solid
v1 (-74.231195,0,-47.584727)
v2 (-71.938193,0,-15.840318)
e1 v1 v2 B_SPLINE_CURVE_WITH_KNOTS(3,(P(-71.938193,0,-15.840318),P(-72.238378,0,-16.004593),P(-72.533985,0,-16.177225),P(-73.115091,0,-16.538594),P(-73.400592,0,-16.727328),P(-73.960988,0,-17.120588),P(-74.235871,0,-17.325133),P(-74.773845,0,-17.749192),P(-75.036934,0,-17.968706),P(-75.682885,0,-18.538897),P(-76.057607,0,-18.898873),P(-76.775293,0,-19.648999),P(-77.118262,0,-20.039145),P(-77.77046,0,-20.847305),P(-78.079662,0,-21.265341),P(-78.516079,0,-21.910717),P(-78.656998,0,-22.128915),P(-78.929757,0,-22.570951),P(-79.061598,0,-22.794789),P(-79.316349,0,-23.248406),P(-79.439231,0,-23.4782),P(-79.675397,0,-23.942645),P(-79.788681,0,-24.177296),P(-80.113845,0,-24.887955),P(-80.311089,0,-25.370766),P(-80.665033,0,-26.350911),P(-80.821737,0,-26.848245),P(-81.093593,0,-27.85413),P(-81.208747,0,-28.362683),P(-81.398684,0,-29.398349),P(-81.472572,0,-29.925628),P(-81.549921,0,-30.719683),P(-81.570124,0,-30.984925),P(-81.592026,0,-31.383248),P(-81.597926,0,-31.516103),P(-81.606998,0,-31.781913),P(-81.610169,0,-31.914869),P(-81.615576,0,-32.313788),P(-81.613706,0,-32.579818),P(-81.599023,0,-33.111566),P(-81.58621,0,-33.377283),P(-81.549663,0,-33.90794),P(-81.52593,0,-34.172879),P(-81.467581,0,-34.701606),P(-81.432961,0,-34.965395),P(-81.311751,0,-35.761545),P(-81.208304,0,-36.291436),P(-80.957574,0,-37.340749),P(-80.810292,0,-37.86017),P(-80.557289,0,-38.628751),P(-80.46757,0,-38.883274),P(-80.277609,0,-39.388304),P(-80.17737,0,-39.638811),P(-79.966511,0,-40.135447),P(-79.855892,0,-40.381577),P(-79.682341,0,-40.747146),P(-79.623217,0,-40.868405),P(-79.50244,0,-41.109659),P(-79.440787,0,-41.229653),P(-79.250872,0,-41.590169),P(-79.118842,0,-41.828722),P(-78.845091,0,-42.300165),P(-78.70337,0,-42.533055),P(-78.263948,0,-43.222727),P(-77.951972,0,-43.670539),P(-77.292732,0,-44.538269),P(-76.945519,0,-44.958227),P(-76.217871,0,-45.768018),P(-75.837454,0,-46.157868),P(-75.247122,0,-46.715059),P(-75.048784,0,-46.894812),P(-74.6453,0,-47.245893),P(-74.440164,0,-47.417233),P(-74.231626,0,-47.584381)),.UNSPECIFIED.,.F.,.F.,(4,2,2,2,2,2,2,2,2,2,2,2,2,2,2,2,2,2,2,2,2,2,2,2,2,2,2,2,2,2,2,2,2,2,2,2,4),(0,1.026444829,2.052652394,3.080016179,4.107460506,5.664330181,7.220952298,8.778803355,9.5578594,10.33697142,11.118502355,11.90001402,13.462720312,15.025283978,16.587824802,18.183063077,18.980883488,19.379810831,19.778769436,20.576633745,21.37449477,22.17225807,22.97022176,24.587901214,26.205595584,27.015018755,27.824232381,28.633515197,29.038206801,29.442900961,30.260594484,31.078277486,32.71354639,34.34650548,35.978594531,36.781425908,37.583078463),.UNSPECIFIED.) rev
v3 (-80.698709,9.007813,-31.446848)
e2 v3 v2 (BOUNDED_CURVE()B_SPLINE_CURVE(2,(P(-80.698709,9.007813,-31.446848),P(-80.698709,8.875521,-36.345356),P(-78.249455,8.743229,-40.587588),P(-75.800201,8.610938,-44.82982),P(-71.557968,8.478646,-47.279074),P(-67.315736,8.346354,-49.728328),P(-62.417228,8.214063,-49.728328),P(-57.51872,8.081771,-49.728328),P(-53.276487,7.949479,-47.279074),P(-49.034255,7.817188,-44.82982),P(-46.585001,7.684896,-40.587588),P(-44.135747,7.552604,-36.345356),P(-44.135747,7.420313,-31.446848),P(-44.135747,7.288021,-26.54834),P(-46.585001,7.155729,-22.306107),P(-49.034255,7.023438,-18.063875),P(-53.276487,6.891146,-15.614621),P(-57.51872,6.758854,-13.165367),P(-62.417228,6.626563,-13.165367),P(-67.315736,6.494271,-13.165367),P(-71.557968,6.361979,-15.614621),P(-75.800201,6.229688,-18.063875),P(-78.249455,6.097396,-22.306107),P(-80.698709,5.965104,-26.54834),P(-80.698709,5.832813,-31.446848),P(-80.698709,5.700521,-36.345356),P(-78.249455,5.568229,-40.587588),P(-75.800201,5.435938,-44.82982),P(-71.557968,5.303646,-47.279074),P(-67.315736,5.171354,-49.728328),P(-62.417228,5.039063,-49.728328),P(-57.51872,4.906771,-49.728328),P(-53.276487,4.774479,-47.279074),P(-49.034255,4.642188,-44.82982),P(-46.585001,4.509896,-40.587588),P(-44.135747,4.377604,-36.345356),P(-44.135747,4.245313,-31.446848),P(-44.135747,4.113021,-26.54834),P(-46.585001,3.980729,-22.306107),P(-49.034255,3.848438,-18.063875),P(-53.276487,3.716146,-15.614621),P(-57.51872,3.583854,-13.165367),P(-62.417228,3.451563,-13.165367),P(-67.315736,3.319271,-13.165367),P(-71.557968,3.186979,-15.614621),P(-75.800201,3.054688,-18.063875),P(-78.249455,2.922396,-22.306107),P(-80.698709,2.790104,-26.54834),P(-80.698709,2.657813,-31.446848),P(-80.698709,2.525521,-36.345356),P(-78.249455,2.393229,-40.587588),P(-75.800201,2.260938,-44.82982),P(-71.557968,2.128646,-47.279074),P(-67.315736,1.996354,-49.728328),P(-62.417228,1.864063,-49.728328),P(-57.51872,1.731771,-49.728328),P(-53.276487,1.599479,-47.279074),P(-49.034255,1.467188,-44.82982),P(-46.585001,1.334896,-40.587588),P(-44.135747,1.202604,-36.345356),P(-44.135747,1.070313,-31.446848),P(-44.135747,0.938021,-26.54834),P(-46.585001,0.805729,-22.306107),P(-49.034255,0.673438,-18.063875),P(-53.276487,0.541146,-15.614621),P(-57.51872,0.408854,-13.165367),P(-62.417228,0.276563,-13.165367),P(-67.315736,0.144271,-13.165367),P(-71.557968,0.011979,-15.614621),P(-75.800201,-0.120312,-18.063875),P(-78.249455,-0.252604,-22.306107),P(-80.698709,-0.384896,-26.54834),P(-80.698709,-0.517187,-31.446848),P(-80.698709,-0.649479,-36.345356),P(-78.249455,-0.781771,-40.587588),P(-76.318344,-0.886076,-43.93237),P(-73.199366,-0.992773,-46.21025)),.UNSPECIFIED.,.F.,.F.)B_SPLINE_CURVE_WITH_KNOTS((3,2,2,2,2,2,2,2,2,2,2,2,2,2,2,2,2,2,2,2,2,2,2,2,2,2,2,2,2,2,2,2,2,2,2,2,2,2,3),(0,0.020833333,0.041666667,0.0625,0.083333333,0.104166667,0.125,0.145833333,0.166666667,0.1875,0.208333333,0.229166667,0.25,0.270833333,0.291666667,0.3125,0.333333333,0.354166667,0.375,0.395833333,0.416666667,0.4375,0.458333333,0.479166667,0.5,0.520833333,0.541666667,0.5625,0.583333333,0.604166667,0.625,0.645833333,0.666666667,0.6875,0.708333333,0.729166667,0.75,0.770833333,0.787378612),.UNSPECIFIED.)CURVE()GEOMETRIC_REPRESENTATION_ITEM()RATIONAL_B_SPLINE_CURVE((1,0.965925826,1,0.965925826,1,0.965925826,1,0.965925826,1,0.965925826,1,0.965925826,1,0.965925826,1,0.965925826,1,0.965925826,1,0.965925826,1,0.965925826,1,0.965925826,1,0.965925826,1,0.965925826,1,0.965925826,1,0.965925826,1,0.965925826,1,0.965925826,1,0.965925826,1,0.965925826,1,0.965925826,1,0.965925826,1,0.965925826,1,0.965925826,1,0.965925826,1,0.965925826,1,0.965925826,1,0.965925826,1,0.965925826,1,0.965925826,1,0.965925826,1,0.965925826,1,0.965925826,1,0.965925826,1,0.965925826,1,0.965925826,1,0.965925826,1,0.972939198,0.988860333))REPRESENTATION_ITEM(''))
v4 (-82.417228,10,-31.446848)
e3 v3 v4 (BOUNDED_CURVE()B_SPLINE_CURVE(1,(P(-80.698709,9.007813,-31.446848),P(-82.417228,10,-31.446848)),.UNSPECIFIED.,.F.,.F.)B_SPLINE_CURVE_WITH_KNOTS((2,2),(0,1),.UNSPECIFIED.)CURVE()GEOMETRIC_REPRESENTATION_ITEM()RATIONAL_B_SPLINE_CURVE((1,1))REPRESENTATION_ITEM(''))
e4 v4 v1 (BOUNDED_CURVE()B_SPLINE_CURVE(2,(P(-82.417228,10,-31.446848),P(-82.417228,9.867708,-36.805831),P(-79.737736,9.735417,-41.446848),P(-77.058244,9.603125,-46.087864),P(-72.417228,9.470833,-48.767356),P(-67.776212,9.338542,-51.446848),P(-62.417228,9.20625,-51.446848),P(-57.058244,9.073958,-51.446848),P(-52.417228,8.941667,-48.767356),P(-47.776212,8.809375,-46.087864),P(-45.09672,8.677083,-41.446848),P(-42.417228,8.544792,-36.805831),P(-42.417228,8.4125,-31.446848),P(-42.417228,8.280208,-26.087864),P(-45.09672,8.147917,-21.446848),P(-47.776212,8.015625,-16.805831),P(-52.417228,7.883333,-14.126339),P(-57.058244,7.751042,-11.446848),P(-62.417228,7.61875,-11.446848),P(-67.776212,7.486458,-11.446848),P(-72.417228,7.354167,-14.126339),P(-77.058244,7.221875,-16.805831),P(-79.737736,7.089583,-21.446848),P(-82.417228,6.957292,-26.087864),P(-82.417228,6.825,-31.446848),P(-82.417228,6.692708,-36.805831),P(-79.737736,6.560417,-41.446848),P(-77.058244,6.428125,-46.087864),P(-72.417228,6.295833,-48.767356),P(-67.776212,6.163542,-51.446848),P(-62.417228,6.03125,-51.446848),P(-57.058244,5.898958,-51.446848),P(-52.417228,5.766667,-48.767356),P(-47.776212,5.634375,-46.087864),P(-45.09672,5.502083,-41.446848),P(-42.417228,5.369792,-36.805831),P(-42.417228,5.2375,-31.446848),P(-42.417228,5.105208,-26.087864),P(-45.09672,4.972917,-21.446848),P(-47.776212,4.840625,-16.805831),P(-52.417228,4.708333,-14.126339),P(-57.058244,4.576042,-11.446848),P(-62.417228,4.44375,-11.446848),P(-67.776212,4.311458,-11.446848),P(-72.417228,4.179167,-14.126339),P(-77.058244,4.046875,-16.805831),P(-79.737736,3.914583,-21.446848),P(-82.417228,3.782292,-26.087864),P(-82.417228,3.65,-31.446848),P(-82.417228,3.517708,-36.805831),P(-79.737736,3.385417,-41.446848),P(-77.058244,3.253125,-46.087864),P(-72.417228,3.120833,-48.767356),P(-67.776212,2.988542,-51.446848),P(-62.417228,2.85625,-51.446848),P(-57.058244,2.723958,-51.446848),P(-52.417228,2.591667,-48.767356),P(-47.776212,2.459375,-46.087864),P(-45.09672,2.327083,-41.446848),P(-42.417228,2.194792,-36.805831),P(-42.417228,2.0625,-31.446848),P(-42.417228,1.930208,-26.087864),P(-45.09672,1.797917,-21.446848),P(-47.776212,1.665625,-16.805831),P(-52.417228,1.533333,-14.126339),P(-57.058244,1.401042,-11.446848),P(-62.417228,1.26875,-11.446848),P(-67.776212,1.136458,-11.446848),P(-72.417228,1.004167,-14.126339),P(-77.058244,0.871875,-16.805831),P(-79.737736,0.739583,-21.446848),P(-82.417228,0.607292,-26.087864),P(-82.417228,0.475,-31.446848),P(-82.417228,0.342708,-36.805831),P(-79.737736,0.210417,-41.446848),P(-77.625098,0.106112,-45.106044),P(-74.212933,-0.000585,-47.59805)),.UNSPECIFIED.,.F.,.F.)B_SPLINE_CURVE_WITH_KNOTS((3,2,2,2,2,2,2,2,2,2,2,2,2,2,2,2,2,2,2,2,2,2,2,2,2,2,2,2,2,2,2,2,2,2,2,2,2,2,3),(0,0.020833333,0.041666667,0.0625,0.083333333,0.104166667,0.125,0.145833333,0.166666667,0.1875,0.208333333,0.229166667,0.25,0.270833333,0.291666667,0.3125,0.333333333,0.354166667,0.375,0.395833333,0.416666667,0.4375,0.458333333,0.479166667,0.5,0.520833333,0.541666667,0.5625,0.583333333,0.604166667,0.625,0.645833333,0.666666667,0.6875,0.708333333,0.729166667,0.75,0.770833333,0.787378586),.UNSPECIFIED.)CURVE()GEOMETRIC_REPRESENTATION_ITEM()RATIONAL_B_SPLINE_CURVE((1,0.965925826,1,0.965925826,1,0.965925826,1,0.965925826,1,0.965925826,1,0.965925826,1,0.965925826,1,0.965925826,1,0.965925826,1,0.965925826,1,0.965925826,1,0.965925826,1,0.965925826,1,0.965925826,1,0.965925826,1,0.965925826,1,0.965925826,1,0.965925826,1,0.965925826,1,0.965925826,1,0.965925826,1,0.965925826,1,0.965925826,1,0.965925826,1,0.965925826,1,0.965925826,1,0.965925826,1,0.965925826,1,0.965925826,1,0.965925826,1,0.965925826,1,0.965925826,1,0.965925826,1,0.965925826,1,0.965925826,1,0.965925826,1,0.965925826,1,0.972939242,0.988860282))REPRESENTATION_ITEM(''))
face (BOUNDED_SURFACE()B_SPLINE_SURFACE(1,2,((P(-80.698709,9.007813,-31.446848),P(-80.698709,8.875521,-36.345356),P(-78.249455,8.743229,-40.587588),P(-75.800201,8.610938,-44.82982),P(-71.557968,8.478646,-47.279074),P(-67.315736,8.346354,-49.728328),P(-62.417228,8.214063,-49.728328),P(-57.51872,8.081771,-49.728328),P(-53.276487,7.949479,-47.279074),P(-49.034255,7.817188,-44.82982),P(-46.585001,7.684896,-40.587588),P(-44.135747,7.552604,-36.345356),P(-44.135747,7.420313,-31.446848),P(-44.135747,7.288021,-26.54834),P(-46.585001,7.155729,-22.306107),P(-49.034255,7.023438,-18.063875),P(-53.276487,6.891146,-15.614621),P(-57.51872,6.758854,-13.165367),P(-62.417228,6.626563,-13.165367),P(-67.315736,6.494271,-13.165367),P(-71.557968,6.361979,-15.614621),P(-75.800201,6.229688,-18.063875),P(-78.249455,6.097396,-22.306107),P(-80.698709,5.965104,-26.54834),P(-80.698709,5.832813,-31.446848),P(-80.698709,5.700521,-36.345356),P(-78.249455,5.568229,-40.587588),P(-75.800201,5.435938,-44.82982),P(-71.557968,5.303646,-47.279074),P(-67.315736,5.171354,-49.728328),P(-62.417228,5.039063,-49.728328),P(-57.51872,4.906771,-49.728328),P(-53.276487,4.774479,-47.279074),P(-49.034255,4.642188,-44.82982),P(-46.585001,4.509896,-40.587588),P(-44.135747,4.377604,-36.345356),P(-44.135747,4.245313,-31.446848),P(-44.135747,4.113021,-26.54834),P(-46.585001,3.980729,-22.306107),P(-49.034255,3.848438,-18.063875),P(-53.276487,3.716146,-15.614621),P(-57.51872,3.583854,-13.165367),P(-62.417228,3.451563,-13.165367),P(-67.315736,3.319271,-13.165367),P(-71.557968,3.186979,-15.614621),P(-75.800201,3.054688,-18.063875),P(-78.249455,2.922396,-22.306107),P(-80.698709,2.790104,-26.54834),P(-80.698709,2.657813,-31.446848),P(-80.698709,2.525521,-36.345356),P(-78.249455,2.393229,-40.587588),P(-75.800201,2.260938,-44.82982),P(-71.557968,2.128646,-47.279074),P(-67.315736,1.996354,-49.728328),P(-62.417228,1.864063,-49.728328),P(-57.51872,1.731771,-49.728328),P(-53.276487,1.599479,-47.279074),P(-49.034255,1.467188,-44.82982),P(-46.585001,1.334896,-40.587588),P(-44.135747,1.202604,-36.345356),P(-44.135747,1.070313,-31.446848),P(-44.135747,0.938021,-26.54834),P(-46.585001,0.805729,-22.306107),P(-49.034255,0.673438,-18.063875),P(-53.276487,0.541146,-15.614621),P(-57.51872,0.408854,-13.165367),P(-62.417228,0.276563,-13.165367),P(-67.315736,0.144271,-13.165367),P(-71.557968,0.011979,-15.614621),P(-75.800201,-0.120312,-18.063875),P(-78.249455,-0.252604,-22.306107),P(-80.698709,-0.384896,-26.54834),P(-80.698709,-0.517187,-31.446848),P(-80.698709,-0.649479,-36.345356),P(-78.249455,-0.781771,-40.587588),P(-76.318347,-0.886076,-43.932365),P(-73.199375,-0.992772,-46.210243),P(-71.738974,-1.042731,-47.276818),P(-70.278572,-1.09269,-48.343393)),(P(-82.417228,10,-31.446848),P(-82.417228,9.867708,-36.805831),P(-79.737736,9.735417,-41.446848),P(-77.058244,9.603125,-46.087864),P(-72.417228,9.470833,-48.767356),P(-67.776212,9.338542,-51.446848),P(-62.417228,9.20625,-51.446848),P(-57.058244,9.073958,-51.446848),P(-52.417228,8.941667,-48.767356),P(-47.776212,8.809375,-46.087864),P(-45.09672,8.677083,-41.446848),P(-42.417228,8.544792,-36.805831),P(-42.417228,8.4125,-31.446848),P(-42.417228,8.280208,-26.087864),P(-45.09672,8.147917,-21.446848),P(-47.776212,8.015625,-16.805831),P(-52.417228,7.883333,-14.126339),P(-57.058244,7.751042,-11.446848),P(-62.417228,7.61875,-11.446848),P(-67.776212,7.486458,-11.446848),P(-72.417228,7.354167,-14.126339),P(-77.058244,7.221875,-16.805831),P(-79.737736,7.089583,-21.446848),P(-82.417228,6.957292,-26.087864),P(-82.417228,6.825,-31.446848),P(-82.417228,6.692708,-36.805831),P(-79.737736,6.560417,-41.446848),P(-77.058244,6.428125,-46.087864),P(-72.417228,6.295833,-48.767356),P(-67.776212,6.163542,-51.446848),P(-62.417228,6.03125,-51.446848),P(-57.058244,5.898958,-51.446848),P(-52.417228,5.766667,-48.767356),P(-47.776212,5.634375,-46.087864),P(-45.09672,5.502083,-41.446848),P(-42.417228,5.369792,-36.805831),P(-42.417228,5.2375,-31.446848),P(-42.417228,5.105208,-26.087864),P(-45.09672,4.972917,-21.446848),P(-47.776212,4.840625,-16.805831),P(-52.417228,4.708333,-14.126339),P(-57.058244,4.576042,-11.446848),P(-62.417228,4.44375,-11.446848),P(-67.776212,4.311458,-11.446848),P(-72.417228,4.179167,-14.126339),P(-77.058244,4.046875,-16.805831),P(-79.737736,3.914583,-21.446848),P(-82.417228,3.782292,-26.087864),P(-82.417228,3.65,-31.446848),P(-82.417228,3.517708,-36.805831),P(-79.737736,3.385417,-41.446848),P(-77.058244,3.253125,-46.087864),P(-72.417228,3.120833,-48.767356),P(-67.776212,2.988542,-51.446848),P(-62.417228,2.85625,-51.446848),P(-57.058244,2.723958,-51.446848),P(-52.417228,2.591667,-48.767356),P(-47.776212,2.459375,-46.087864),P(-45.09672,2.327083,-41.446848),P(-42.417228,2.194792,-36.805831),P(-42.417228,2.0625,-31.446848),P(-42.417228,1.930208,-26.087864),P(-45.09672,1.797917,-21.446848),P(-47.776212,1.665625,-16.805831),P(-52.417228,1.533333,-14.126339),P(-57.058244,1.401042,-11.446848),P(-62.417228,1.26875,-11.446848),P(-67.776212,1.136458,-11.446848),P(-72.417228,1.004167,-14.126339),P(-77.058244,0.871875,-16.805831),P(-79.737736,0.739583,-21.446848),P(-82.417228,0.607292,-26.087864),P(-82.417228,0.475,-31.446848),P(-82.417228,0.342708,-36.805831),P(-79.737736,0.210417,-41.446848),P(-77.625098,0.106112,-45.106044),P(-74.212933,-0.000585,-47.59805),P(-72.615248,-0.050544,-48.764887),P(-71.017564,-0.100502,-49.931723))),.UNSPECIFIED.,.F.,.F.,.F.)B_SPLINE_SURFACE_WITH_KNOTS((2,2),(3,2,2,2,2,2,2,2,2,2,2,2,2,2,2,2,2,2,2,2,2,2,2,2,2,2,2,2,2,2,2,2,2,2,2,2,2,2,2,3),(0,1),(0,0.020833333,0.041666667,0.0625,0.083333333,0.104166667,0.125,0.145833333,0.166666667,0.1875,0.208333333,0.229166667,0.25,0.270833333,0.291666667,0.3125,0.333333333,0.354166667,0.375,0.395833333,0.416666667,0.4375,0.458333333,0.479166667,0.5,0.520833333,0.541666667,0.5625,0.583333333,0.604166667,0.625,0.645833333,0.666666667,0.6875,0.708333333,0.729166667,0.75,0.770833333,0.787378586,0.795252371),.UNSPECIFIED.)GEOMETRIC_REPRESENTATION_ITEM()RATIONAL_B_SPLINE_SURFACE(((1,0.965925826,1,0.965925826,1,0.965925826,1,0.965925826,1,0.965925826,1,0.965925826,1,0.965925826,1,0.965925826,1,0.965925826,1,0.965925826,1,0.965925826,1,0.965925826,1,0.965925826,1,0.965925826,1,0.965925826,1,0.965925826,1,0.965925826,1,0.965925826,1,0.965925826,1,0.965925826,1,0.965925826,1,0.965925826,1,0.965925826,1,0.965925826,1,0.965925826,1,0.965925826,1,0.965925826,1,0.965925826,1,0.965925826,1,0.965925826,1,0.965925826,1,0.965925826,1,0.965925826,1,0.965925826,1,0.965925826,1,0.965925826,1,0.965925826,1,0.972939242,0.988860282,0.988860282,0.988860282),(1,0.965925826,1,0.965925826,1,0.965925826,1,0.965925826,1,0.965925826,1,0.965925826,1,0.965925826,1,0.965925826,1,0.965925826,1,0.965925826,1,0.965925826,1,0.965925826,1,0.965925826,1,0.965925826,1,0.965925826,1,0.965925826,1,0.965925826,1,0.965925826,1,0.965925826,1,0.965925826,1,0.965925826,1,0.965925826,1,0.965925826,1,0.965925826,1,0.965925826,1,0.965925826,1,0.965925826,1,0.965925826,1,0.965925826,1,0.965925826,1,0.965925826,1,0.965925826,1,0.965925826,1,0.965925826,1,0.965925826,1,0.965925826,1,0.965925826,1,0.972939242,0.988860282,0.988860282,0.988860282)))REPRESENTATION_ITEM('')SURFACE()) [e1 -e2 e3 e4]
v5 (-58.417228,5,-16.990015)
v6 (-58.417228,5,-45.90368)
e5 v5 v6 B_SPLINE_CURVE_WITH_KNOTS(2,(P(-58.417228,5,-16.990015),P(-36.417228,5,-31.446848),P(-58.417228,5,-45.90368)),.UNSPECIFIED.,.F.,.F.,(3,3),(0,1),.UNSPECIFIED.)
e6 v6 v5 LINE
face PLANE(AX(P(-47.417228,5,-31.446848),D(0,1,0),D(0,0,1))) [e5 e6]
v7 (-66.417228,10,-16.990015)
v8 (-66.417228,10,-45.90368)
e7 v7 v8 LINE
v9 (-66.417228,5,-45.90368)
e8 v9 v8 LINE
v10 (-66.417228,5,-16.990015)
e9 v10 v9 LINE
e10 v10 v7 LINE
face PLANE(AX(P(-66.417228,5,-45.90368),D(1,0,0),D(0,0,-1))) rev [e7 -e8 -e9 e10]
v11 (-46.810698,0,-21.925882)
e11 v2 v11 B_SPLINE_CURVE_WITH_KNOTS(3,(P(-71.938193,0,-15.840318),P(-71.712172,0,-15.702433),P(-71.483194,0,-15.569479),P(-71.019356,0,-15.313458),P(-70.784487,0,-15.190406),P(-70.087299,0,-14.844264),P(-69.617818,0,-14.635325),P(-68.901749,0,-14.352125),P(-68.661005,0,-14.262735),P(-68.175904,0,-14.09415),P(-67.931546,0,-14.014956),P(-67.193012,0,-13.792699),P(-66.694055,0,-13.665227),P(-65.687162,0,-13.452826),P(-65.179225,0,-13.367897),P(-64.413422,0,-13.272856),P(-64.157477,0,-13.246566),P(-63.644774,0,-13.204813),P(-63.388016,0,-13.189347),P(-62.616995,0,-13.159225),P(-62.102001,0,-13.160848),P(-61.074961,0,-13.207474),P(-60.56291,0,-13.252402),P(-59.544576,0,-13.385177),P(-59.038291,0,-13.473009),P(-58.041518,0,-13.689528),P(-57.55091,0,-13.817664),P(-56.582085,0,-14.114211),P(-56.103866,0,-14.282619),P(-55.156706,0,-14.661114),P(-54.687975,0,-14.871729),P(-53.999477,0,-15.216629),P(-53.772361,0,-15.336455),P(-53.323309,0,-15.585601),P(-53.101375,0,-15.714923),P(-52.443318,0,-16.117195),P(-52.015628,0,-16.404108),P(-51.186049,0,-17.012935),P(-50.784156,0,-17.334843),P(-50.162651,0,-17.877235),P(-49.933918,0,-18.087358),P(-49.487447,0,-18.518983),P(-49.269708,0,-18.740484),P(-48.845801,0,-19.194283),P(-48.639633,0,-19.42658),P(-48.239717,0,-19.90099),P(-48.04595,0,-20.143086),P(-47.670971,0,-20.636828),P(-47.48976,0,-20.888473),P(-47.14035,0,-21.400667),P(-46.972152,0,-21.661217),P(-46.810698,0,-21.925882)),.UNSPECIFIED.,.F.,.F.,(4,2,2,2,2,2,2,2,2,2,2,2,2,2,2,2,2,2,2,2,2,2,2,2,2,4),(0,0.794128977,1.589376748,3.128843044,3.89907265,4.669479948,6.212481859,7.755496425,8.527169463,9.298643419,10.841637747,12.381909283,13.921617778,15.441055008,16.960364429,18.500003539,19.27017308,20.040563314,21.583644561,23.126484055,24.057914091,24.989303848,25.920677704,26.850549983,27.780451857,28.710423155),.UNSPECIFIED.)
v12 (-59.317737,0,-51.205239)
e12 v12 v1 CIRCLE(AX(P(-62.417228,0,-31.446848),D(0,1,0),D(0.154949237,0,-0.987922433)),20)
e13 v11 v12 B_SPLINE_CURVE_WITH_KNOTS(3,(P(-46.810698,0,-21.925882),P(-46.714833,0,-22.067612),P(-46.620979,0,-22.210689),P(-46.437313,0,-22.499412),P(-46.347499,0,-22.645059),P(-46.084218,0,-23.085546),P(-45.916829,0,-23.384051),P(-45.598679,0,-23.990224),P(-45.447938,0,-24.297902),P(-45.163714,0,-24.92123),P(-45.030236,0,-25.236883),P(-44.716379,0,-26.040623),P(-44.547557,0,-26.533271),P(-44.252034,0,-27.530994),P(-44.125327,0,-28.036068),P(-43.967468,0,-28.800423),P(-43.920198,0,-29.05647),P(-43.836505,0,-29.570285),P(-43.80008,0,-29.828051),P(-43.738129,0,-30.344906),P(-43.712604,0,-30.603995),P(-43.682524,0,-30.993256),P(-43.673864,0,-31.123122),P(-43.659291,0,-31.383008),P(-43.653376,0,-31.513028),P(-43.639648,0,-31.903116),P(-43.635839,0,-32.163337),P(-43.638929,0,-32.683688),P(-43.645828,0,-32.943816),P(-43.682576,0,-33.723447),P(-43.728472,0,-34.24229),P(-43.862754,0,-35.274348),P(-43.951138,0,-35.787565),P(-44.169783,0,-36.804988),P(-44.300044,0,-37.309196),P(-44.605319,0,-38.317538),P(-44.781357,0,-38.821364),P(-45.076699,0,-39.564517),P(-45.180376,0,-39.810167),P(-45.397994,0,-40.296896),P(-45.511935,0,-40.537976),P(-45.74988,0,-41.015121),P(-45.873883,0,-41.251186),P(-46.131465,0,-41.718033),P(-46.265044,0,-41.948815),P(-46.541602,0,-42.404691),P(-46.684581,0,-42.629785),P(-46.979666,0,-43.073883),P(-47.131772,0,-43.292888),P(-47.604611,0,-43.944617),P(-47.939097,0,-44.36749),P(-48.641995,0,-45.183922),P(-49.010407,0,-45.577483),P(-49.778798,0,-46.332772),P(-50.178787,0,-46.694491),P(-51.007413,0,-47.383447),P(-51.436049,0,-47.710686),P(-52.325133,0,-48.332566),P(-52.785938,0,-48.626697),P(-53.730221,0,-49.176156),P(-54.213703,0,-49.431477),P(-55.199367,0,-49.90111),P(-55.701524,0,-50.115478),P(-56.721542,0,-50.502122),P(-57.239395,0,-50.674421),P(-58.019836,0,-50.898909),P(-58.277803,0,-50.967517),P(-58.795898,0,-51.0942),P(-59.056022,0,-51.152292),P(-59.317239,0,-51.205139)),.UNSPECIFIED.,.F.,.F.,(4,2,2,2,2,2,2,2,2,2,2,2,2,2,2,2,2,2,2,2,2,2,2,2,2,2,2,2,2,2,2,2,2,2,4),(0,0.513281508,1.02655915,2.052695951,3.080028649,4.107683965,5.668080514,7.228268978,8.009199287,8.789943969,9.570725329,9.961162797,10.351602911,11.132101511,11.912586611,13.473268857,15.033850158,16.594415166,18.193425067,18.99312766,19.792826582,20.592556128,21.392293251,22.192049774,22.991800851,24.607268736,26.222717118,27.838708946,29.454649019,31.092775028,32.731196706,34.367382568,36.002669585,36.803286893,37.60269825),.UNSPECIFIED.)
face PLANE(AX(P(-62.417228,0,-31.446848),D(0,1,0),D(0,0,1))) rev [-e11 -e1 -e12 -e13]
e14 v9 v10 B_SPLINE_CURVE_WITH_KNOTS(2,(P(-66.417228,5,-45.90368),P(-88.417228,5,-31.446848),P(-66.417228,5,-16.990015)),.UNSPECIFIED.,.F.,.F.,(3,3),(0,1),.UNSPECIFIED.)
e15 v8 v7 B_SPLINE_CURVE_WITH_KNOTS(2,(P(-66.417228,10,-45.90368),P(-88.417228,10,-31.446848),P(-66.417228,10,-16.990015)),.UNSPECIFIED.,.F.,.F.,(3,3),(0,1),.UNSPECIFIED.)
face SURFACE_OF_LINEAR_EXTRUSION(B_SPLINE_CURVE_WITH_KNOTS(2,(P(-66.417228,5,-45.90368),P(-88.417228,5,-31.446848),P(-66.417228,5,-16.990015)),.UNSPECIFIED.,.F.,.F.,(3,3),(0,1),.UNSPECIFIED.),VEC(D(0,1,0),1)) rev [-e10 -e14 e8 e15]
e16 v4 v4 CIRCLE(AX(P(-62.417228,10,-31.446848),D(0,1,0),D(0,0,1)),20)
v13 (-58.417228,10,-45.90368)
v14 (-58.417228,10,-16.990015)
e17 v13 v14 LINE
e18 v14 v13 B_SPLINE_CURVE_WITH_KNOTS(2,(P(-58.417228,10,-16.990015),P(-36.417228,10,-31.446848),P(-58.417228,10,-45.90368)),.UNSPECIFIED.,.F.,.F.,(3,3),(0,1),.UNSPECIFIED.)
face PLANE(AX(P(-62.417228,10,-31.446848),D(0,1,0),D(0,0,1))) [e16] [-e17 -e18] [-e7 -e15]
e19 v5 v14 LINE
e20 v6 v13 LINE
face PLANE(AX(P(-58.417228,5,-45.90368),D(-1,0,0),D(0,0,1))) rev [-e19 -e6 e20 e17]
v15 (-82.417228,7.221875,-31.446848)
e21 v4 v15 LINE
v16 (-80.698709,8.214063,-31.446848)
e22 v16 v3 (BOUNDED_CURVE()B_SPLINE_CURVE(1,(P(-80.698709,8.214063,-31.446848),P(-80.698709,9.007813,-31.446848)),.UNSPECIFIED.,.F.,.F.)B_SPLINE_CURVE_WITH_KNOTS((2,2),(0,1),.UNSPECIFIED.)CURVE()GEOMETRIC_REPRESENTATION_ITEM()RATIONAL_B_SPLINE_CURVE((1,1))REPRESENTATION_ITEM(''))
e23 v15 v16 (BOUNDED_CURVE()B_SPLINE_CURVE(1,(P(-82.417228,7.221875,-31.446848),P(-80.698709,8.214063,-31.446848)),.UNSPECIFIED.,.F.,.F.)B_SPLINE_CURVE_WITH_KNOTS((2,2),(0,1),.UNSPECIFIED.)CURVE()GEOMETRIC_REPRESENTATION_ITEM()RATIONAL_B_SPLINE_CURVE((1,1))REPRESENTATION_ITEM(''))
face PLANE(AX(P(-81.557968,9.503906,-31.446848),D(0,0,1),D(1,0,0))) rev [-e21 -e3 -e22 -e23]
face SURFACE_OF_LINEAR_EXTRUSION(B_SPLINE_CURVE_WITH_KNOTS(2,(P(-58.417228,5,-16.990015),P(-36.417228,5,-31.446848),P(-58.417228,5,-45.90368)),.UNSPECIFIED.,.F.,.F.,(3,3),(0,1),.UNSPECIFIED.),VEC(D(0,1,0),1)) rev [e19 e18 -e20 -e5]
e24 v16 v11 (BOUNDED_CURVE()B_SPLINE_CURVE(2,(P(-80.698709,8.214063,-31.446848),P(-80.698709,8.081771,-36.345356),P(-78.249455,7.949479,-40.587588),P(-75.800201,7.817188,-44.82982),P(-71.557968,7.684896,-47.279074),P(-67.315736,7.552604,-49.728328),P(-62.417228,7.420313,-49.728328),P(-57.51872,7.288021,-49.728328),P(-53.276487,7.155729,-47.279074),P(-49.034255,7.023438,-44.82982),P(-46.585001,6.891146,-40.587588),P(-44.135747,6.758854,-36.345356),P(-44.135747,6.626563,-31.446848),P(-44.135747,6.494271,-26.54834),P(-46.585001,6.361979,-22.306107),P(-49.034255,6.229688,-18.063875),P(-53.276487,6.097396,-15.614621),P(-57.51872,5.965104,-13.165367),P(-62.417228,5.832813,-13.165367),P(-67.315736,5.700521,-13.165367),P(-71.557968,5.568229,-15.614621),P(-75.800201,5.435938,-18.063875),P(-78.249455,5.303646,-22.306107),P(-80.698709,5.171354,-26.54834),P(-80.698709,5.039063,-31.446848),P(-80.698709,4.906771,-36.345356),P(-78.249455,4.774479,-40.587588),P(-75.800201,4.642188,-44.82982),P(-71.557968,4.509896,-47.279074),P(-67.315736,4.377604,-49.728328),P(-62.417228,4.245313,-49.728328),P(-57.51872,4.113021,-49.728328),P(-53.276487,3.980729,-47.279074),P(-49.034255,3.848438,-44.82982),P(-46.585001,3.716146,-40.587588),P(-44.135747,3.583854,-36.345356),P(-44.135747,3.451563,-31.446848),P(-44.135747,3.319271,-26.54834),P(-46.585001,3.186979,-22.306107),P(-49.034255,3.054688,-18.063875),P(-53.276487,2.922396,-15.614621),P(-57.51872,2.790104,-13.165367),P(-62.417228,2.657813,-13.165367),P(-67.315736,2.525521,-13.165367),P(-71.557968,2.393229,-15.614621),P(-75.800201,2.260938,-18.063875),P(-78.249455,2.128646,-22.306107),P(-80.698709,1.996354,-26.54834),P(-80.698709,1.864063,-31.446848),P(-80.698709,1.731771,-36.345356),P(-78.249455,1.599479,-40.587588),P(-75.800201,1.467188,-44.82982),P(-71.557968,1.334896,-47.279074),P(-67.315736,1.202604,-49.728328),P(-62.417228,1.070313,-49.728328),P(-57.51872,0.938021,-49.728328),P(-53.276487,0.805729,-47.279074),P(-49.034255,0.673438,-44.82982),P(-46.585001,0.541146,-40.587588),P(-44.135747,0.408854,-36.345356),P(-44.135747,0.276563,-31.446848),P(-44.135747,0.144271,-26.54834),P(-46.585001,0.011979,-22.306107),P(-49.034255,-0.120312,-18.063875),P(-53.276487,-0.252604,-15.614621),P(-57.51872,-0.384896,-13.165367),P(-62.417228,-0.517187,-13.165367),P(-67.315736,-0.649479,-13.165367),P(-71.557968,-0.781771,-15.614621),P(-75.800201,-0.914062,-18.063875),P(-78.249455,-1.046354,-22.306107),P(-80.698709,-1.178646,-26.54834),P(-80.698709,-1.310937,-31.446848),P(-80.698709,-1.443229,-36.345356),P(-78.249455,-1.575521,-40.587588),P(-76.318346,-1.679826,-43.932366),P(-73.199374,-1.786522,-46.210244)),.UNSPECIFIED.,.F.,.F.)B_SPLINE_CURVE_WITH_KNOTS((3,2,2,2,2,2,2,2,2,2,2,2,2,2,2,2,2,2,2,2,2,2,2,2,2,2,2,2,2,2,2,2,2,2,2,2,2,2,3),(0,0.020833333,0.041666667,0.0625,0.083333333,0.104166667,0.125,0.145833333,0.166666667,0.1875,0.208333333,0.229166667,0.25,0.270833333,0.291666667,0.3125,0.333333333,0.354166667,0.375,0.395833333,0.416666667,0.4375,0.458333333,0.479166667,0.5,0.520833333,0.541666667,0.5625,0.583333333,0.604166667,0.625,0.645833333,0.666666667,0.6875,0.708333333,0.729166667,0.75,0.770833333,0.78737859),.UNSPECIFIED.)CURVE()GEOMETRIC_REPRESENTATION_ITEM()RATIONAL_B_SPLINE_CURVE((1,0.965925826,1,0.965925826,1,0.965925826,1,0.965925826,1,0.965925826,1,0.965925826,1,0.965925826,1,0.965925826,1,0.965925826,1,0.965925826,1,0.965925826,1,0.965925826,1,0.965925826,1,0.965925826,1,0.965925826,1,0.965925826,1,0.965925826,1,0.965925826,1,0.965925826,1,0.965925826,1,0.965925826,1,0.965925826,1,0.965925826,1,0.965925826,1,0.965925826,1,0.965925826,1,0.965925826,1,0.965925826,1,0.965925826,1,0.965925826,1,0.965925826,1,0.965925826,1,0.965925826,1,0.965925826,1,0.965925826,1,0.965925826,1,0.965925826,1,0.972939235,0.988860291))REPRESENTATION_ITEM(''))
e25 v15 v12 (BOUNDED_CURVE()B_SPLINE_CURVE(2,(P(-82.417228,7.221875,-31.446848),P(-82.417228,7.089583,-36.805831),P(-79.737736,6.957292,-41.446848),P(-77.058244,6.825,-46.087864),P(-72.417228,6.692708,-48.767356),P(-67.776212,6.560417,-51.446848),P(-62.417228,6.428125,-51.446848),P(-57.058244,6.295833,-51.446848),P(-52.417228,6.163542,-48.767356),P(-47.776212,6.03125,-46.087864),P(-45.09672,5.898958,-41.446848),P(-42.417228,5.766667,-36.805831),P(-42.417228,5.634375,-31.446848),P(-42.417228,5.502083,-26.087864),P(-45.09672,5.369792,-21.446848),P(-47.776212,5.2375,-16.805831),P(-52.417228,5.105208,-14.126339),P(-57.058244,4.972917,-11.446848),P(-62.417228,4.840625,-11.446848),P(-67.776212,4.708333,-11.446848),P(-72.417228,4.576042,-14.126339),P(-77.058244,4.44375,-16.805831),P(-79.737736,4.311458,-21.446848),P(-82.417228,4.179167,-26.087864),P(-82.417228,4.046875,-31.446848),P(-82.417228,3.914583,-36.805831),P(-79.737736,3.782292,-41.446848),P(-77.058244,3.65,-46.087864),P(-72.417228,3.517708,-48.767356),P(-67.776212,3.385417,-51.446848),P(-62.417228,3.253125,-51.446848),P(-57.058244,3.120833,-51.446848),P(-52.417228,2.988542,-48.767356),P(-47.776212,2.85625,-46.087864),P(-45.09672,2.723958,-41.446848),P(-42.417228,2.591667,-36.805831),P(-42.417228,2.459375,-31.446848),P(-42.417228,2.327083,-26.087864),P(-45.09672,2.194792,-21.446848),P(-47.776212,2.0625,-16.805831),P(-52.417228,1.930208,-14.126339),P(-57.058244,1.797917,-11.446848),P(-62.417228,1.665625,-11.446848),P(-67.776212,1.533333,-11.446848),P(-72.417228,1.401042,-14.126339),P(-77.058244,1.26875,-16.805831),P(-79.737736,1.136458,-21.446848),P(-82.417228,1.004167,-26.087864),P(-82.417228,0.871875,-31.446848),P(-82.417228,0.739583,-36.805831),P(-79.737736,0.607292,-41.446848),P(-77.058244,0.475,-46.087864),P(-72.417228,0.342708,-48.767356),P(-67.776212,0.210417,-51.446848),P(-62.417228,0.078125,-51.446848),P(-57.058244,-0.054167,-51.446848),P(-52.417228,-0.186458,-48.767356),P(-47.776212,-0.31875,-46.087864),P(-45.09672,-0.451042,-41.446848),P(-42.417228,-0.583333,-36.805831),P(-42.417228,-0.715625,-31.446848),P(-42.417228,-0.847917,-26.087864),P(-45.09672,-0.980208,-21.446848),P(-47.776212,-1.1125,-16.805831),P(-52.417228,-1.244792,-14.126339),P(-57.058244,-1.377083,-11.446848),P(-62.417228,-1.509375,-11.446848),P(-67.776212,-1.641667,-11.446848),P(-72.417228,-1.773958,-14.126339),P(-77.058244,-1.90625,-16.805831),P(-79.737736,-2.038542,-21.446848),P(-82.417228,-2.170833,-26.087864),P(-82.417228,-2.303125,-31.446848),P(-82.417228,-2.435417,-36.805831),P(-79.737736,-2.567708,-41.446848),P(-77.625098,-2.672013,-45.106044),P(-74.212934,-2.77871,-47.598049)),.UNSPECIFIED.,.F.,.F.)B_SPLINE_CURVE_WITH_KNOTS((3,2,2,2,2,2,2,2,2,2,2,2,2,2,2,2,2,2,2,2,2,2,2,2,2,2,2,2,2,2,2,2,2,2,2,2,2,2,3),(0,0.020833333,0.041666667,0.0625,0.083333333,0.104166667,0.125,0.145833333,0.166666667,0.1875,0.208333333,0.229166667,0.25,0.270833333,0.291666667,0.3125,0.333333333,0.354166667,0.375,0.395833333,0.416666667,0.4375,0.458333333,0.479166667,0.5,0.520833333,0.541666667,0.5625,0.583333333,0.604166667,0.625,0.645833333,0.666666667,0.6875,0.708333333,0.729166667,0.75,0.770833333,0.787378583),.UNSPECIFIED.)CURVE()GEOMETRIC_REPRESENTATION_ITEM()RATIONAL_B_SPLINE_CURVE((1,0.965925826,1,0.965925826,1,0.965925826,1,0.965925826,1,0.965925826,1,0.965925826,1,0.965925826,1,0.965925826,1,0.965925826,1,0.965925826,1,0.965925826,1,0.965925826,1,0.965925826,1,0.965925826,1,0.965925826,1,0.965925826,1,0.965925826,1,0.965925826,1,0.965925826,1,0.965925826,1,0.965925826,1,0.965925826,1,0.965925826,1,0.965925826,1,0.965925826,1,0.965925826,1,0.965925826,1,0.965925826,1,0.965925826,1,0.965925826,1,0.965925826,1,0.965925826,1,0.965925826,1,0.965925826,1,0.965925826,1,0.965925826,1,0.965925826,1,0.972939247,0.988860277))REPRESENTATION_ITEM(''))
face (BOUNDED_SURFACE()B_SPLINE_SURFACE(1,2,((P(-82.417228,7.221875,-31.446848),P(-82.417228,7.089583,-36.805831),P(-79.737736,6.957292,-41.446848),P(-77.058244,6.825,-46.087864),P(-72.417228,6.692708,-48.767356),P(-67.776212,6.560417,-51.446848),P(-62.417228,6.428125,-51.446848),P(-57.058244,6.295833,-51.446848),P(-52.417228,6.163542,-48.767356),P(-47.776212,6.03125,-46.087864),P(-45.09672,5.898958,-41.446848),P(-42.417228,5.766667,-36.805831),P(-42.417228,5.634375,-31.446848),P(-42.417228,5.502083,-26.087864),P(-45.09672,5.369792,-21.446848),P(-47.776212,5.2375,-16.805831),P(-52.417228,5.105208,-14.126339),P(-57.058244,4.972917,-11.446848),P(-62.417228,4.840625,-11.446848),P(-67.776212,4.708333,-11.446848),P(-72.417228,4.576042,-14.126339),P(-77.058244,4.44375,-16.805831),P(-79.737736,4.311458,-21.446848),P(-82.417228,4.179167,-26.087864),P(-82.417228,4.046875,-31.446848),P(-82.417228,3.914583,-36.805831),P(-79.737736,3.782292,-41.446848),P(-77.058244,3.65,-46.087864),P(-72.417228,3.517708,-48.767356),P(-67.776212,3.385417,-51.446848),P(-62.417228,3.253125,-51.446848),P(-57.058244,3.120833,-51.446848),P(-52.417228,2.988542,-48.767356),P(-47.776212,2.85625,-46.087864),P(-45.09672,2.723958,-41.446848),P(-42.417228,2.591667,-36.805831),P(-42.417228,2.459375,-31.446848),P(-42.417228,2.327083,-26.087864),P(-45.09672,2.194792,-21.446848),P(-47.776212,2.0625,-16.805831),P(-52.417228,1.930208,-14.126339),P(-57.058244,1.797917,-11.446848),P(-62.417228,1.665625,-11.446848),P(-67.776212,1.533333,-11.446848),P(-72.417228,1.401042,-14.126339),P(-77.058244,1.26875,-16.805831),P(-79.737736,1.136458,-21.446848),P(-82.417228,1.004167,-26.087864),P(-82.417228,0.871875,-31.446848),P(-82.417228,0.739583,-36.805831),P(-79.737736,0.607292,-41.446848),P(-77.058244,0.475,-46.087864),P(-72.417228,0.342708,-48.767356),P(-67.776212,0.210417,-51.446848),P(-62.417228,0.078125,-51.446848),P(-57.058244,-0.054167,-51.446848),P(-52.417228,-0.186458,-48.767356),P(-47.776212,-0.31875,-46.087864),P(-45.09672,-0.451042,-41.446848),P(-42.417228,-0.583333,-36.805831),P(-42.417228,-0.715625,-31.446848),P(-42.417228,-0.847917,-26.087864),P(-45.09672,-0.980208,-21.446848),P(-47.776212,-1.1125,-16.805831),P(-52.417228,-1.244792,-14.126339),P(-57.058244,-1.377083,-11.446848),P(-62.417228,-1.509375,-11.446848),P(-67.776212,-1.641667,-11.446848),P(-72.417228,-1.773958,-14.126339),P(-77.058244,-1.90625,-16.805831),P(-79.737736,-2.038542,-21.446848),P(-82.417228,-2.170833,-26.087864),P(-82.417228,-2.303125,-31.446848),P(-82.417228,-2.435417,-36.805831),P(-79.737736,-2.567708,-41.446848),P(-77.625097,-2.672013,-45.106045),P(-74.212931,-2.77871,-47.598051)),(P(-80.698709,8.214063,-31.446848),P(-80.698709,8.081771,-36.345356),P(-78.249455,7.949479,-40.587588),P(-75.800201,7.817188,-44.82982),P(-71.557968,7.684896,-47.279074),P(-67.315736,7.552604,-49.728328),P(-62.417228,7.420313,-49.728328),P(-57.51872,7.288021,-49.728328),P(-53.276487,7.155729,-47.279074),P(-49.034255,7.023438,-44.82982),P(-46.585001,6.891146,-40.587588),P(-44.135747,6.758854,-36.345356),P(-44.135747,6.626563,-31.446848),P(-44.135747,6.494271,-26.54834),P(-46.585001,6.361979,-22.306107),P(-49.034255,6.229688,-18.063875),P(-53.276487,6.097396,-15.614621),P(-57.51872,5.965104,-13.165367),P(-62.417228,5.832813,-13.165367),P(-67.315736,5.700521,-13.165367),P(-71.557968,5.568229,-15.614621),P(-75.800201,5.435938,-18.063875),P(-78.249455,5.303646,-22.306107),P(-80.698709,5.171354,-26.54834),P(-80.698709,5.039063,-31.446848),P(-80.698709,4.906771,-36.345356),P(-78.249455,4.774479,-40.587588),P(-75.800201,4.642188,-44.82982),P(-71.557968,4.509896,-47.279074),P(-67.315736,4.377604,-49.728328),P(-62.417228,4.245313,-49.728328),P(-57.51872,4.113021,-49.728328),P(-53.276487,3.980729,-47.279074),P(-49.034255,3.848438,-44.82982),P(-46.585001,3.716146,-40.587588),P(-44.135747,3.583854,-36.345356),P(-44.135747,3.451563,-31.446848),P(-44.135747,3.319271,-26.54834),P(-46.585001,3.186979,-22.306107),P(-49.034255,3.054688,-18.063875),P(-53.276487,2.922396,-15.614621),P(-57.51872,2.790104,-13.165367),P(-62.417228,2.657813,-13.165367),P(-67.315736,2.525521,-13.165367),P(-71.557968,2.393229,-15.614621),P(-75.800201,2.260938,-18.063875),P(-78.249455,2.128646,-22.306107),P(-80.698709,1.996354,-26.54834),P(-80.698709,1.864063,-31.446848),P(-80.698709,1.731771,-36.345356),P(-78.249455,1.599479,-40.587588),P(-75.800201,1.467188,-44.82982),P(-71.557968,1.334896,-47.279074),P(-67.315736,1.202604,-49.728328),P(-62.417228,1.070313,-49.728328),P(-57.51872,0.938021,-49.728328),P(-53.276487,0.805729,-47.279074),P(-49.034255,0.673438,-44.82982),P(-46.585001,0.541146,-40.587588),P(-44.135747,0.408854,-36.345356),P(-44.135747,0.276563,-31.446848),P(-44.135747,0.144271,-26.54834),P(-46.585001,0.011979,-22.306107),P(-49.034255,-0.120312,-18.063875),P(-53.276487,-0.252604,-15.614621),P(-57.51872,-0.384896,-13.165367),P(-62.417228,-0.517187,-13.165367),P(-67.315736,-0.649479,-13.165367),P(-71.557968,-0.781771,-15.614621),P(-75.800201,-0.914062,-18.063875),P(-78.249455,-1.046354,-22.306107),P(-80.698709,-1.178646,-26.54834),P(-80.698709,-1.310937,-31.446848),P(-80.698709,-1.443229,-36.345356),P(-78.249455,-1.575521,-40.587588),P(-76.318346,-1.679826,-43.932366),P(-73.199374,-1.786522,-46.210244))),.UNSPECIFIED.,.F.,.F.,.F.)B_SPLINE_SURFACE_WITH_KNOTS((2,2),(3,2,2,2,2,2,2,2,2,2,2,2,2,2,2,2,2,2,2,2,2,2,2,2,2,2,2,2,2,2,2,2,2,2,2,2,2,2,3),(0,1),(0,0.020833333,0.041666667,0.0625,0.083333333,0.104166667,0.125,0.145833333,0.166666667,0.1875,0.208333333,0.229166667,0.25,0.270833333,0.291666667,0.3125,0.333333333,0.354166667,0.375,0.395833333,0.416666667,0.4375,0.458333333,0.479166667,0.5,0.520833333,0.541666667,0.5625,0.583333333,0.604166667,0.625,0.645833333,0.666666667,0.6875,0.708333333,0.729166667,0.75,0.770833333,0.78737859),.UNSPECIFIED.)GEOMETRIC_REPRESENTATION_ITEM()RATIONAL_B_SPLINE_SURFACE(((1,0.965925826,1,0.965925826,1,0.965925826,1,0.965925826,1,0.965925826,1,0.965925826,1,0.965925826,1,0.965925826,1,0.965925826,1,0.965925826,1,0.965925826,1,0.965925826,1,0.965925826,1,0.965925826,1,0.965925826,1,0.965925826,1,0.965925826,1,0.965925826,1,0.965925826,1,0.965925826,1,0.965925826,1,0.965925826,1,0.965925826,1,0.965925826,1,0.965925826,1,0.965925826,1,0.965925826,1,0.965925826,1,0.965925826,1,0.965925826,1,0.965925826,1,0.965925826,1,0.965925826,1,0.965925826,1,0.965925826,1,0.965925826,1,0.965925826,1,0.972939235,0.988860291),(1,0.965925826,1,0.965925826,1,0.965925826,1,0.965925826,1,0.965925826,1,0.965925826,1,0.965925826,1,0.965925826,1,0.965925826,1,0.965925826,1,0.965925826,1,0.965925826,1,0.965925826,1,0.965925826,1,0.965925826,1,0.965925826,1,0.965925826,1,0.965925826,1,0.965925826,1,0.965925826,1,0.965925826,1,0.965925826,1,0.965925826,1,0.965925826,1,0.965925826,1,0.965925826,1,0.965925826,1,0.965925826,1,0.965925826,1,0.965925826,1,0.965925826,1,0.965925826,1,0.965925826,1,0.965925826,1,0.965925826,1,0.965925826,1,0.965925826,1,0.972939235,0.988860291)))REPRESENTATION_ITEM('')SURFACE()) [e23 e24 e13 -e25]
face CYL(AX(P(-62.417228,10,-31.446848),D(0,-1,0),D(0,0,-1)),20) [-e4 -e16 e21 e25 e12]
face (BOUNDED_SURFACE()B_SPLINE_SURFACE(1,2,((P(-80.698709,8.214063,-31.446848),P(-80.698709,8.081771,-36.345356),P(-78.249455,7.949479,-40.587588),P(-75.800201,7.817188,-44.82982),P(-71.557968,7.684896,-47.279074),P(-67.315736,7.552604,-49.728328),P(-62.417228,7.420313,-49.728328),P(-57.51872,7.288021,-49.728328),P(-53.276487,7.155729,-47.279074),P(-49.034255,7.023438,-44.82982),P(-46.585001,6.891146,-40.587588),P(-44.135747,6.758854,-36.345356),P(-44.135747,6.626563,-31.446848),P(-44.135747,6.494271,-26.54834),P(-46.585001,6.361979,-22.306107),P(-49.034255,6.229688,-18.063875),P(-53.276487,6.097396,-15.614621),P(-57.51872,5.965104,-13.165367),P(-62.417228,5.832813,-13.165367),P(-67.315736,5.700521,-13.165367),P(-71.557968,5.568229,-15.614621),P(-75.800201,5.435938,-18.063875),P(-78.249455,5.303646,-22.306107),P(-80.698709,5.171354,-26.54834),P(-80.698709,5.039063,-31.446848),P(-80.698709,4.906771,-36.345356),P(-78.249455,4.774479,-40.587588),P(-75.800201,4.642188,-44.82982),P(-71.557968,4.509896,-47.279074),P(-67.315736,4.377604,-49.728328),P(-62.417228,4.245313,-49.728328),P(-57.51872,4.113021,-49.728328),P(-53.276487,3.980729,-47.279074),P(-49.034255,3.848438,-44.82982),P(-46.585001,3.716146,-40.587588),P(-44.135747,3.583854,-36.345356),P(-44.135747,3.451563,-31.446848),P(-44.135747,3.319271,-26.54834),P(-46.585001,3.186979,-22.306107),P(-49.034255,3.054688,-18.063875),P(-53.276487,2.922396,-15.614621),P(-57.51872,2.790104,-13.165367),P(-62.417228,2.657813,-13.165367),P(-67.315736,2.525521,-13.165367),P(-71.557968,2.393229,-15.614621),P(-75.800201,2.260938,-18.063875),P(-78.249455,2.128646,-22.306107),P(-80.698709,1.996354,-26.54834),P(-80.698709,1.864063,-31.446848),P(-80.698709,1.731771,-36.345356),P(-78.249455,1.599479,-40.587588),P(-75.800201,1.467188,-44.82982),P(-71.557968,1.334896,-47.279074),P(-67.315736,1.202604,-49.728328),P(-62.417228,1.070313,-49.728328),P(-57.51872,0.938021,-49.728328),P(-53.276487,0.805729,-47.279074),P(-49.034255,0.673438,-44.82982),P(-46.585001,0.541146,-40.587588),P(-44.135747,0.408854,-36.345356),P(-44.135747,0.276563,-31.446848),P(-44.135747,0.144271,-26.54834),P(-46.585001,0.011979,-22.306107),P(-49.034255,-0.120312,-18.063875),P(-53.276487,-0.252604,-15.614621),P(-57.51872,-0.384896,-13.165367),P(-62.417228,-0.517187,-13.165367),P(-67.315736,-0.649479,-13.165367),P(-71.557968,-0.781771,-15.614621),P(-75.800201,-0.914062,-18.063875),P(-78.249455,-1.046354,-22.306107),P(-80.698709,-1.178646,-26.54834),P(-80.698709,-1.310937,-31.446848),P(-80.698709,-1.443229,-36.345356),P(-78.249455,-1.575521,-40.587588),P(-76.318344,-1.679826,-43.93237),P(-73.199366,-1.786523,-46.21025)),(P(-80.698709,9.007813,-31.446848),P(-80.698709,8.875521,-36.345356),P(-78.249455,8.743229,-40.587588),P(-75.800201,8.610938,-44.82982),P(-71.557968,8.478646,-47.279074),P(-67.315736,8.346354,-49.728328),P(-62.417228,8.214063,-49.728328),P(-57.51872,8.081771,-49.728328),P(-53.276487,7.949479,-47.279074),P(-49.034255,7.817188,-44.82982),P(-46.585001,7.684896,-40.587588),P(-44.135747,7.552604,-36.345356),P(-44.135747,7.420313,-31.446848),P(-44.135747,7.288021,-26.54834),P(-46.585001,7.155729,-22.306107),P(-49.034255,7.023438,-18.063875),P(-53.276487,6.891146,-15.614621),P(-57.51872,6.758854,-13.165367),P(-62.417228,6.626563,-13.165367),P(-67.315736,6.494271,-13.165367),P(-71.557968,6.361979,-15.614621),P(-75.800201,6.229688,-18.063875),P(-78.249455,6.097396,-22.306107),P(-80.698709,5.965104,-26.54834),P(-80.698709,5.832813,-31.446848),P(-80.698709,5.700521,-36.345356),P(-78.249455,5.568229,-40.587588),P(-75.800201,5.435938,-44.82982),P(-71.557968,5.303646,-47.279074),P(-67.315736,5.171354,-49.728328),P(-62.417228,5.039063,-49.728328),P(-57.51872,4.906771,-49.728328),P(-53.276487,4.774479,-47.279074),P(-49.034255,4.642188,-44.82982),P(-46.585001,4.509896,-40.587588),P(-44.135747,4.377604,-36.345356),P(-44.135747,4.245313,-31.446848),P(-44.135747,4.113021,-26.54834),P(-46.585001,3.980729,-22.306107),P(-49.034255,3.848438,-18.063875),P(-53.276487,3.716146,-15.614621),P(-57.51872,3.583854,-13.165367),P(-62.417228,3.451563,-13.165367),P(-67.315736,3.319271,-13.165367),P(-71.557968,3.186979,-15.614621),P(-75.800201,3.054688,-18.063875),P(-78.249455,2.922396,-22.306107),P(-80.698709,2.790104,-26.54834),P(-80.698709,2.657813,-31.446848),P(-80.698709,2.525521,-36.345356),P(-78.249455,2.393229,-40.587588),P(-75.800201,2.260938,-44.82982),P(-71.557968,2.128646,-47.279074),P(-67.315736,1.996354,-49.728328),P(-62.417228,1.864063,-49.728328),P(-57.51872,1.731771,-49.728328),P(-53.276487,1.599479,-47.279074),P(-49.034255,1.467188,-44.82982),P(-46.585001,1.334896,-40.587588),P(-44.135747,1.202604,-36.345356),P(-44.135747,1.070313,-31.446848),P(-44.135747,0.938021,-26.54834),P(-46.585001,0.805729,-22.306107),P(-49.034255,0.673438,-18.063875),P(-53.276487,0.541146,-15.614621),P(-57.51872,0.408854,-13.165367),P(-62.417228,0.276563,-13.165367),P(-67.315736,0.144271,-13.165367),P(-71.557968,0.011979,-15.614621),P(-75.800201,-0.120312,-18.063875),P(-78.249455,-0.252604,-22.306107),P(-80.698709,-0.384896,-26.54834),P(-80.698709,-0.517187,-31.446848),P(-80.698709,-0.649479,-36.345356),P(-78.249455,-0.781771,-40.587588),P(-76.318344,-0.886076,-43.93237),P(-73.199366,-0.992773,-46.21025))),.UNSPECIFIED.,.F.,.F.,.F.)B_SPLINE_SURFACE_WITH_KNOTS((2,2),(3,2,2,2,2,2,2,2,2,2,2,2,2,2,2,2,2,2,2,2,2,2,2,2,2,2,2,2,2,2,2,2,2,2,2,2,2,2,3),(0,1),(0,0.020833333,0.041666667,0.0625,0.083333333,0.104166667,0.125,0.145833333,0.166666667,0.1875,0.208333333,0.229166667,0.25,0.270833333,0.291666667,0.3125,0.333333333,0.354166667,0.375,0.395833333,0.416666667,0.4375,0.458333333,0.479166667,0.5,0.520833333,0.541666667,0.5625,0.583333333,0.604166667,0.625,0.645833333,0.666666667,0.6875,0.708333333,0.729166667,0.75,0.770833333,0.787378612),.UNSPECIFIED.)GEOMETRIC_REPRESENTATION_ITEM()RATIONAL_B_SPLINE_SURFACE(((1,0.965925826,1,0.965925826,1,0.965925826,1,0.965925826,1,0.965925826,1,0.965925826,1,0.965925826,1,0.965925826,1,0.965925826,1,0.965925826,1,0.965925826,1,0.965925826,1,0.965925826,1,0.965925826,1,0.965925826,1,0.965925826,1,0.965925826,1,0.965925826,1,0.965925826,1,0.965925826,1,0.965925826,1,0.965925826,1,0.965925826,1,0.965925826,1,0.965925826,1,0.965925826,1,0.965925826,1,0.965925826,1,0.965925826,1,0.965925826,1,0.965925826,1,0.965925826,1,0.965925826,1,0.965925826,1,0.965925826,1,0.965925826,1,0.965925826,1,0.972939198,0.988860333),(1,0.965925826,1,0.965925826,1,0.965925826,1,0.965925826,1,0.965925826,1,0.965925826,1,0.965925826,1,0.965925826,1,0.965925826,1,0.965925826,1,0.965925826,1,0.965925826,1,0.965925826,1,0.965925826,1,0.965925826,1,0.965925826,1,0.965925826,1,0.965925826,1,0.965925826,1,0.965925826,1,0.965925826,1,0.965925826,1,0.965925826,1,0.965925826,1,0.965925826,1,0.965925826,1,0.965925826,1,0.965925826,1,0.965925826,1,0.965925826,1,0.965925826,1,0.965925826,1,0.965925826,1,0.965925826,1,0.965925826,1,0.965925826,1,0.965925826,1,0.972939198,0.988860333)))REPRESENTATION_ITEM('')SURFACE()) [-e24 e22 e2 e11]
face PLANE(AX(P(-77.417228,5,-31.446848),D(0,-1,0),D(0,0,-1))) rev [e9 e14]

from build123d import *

# Parameters (mm, degrees)
SKETCH1_R           = 20
BOSS_EXTRUDE1_DEPTH = 10
THREAD1_PITCH       = 3.175
CUT_EXTRUDE2_DEPTH  = 5


with BuildPart() as part:
    # Sketch1 → Boss-Extrude1 (new body)
    with BuildSketch(Plane(origin=(0, 0, 0), x_dir=(1, 0, 0), z_dir=(0, 1, 0))):
        with Locations(Location((-62.417227704, 31.446847546, 0), (0, 0, 270))):
            Circle(SKETCH1_R)
    extrude(amount=BOSS_EXTRUDE1_DEPTH)

    # Thread1: the profile of Thread Profile1 profile screwed along a right-hand helix of 3.149606 turns, 12 arcs to a turn; built about Z, then put on its axis
    thread1_z = Axis((0, 0, 0), (0, 0, 1))
    thread1_corners = [(20.0003, 0, -0.000173205), (20.0003, 0, 2.778298196), (18.281480847, 0, 1.785937496), (18.281480847, 0, 0.992187496)]
    with BuildLine(mode=Mode.PRIVATE) as thread1_profile:
        Line(thread1_corners[0], thread1_corners[1])
        Line(thread1_corners[1], thread1_corners[2])
        Line(thread1_corners[2], thread1_corners[3])
        Line(thread1_corners[3], thread1_corners[0])
    thread1_cap = Face(thread1_profile.wire())
    thread1_turn_angles = [0, 15, 30, 45, 60, 75, 90, 105, 120, 135, 150, 165, 180, 195, 210, 225, 240, 255, 270, 285, 300, 315, 330, 345, 360]
    thread1_turn_weights = [1, 0.9659258262890683, 1, 0.9659258262890683, 1, 0.9659258262890683, 1, 0.9659258262890683, 1, 0.9659258262890683, 1, 0.9659258262890683, 1, 0.9659258262890683, 1, 0.9659258262890683, 1, 0.9659258262890683, 1, 0.9659258262890683, 1, 0.9659258262890683, 1, 0.9659258262890683, 1]
    thread1_turn_rails = [Edge.make_bspline([Vector(p[0], p[1], 0).rotate(thread1_z, thread1_turn_angles[k]) / thread1_turn_weights[k] + Vector(0, 0, p[2] + THREAD1_PITCH * thread1_turn_angles[k] / 360) for k in range(25)], [0, 0, 0, 1, 1, 2, 2, 3, 3, 4, 4, 5, 5, 6, 6, 7, 7, 8, 8, 9, 9, 10, 10, 11, 11, 12, 12, 12], 2, thread1_turn_weights) for p in thread1_corners]
    thread1_turn_sides = [Face.make_surface_from_curves(thread1_turn_rails[p[0]], thread1_turn_rails[p[1]]) for p in [(0, 1), (1, 2), (2, 3), (3, 0)]]
    thread1_last_angles = [1080, 1095, 1110, 1121.929133858, 1133.858267717]
    thread1_last_weights = [1, 0.9659258262890683, 1, 0.9784040075425771, 1]
    thread1_last_rails = [Edge.make_bspline([Vector(p[0], p[1], 0).rotate(thread1_z, thread1_last_angles[k]) / thread1_last_weights[k] + Vector(0, 0, p[2] + THREAD1_PITCH * thread1_last_angles[k] / 360) for k in range(5)], [0, 0, 0, 1, 1, 2, 2, 2], 2, thread1_last_weights) for p in thread1_corners]
    thread1_last_sides = [Face.make_surface_from_curves(thread1_last_rails[p[0]], thread1_last_rails[p[1]]) for p in [(0, 1), (1, 2), (2, 3), (3, 0)]]
    thread1 = Plane(origin=(-62.417227704, 10, -31.446847546), x_dir=(-1, 0, 0), z_dir=(0, -1, 0)) * Solid(Shell([*[p.moved(Location((0, 0, THREAD1_PITCH * i))) for i in range(3) for p in thread1_turn_sides], *thread1_last_sides, thread1_cap, thread1_cap.rotate(thread1_z, 1133.858267717).moved(Location((0, 0, THREAD1_PITCH * 1133.858267717 / 360)))]))
    add(thread1, mode=Mode.SUBTRACT)

    # Sketch9 → Cut-Extrude2 (cut)
    with BuildSketch(Plane(origin=(0, 10, 0), x_dir=(1, 0, 0), z_dir=(0, 1, 0))):
        with BuildLine():
            Line((-66.417227704, 45.90367984), (-66.417227704, 31.446847546))
            Line((-66.417227704, 31.446847546), (-66.417227704, 16.990015251))
            add(Edge.make_bspline(
                [(-66.417227704, 45.90367984), (-88.417227704, 31.446847546), (-66.417227704, 16.990015251)],
                knots=[0, 0, 0, 1, 1, 1], degree=2))
        make_face()
        with BuildLine():
            Line((-58.417227704, 45.90367984), (-58.417227704, 16.990015251))
            add(Edge.make_bspline(
                [(-58.417227704, 45.90367984), (-36.417227704, 31.446847546), (-58.417227704, 16.990015251)],
                knots=[0, 0, 0, 1, 1, 1], degree=2))
        make_face()
    extrude(amount=-CUT_EXTRUDE2_DEPTH, mode=Mode.SUBTRACT)


solid = part.part
